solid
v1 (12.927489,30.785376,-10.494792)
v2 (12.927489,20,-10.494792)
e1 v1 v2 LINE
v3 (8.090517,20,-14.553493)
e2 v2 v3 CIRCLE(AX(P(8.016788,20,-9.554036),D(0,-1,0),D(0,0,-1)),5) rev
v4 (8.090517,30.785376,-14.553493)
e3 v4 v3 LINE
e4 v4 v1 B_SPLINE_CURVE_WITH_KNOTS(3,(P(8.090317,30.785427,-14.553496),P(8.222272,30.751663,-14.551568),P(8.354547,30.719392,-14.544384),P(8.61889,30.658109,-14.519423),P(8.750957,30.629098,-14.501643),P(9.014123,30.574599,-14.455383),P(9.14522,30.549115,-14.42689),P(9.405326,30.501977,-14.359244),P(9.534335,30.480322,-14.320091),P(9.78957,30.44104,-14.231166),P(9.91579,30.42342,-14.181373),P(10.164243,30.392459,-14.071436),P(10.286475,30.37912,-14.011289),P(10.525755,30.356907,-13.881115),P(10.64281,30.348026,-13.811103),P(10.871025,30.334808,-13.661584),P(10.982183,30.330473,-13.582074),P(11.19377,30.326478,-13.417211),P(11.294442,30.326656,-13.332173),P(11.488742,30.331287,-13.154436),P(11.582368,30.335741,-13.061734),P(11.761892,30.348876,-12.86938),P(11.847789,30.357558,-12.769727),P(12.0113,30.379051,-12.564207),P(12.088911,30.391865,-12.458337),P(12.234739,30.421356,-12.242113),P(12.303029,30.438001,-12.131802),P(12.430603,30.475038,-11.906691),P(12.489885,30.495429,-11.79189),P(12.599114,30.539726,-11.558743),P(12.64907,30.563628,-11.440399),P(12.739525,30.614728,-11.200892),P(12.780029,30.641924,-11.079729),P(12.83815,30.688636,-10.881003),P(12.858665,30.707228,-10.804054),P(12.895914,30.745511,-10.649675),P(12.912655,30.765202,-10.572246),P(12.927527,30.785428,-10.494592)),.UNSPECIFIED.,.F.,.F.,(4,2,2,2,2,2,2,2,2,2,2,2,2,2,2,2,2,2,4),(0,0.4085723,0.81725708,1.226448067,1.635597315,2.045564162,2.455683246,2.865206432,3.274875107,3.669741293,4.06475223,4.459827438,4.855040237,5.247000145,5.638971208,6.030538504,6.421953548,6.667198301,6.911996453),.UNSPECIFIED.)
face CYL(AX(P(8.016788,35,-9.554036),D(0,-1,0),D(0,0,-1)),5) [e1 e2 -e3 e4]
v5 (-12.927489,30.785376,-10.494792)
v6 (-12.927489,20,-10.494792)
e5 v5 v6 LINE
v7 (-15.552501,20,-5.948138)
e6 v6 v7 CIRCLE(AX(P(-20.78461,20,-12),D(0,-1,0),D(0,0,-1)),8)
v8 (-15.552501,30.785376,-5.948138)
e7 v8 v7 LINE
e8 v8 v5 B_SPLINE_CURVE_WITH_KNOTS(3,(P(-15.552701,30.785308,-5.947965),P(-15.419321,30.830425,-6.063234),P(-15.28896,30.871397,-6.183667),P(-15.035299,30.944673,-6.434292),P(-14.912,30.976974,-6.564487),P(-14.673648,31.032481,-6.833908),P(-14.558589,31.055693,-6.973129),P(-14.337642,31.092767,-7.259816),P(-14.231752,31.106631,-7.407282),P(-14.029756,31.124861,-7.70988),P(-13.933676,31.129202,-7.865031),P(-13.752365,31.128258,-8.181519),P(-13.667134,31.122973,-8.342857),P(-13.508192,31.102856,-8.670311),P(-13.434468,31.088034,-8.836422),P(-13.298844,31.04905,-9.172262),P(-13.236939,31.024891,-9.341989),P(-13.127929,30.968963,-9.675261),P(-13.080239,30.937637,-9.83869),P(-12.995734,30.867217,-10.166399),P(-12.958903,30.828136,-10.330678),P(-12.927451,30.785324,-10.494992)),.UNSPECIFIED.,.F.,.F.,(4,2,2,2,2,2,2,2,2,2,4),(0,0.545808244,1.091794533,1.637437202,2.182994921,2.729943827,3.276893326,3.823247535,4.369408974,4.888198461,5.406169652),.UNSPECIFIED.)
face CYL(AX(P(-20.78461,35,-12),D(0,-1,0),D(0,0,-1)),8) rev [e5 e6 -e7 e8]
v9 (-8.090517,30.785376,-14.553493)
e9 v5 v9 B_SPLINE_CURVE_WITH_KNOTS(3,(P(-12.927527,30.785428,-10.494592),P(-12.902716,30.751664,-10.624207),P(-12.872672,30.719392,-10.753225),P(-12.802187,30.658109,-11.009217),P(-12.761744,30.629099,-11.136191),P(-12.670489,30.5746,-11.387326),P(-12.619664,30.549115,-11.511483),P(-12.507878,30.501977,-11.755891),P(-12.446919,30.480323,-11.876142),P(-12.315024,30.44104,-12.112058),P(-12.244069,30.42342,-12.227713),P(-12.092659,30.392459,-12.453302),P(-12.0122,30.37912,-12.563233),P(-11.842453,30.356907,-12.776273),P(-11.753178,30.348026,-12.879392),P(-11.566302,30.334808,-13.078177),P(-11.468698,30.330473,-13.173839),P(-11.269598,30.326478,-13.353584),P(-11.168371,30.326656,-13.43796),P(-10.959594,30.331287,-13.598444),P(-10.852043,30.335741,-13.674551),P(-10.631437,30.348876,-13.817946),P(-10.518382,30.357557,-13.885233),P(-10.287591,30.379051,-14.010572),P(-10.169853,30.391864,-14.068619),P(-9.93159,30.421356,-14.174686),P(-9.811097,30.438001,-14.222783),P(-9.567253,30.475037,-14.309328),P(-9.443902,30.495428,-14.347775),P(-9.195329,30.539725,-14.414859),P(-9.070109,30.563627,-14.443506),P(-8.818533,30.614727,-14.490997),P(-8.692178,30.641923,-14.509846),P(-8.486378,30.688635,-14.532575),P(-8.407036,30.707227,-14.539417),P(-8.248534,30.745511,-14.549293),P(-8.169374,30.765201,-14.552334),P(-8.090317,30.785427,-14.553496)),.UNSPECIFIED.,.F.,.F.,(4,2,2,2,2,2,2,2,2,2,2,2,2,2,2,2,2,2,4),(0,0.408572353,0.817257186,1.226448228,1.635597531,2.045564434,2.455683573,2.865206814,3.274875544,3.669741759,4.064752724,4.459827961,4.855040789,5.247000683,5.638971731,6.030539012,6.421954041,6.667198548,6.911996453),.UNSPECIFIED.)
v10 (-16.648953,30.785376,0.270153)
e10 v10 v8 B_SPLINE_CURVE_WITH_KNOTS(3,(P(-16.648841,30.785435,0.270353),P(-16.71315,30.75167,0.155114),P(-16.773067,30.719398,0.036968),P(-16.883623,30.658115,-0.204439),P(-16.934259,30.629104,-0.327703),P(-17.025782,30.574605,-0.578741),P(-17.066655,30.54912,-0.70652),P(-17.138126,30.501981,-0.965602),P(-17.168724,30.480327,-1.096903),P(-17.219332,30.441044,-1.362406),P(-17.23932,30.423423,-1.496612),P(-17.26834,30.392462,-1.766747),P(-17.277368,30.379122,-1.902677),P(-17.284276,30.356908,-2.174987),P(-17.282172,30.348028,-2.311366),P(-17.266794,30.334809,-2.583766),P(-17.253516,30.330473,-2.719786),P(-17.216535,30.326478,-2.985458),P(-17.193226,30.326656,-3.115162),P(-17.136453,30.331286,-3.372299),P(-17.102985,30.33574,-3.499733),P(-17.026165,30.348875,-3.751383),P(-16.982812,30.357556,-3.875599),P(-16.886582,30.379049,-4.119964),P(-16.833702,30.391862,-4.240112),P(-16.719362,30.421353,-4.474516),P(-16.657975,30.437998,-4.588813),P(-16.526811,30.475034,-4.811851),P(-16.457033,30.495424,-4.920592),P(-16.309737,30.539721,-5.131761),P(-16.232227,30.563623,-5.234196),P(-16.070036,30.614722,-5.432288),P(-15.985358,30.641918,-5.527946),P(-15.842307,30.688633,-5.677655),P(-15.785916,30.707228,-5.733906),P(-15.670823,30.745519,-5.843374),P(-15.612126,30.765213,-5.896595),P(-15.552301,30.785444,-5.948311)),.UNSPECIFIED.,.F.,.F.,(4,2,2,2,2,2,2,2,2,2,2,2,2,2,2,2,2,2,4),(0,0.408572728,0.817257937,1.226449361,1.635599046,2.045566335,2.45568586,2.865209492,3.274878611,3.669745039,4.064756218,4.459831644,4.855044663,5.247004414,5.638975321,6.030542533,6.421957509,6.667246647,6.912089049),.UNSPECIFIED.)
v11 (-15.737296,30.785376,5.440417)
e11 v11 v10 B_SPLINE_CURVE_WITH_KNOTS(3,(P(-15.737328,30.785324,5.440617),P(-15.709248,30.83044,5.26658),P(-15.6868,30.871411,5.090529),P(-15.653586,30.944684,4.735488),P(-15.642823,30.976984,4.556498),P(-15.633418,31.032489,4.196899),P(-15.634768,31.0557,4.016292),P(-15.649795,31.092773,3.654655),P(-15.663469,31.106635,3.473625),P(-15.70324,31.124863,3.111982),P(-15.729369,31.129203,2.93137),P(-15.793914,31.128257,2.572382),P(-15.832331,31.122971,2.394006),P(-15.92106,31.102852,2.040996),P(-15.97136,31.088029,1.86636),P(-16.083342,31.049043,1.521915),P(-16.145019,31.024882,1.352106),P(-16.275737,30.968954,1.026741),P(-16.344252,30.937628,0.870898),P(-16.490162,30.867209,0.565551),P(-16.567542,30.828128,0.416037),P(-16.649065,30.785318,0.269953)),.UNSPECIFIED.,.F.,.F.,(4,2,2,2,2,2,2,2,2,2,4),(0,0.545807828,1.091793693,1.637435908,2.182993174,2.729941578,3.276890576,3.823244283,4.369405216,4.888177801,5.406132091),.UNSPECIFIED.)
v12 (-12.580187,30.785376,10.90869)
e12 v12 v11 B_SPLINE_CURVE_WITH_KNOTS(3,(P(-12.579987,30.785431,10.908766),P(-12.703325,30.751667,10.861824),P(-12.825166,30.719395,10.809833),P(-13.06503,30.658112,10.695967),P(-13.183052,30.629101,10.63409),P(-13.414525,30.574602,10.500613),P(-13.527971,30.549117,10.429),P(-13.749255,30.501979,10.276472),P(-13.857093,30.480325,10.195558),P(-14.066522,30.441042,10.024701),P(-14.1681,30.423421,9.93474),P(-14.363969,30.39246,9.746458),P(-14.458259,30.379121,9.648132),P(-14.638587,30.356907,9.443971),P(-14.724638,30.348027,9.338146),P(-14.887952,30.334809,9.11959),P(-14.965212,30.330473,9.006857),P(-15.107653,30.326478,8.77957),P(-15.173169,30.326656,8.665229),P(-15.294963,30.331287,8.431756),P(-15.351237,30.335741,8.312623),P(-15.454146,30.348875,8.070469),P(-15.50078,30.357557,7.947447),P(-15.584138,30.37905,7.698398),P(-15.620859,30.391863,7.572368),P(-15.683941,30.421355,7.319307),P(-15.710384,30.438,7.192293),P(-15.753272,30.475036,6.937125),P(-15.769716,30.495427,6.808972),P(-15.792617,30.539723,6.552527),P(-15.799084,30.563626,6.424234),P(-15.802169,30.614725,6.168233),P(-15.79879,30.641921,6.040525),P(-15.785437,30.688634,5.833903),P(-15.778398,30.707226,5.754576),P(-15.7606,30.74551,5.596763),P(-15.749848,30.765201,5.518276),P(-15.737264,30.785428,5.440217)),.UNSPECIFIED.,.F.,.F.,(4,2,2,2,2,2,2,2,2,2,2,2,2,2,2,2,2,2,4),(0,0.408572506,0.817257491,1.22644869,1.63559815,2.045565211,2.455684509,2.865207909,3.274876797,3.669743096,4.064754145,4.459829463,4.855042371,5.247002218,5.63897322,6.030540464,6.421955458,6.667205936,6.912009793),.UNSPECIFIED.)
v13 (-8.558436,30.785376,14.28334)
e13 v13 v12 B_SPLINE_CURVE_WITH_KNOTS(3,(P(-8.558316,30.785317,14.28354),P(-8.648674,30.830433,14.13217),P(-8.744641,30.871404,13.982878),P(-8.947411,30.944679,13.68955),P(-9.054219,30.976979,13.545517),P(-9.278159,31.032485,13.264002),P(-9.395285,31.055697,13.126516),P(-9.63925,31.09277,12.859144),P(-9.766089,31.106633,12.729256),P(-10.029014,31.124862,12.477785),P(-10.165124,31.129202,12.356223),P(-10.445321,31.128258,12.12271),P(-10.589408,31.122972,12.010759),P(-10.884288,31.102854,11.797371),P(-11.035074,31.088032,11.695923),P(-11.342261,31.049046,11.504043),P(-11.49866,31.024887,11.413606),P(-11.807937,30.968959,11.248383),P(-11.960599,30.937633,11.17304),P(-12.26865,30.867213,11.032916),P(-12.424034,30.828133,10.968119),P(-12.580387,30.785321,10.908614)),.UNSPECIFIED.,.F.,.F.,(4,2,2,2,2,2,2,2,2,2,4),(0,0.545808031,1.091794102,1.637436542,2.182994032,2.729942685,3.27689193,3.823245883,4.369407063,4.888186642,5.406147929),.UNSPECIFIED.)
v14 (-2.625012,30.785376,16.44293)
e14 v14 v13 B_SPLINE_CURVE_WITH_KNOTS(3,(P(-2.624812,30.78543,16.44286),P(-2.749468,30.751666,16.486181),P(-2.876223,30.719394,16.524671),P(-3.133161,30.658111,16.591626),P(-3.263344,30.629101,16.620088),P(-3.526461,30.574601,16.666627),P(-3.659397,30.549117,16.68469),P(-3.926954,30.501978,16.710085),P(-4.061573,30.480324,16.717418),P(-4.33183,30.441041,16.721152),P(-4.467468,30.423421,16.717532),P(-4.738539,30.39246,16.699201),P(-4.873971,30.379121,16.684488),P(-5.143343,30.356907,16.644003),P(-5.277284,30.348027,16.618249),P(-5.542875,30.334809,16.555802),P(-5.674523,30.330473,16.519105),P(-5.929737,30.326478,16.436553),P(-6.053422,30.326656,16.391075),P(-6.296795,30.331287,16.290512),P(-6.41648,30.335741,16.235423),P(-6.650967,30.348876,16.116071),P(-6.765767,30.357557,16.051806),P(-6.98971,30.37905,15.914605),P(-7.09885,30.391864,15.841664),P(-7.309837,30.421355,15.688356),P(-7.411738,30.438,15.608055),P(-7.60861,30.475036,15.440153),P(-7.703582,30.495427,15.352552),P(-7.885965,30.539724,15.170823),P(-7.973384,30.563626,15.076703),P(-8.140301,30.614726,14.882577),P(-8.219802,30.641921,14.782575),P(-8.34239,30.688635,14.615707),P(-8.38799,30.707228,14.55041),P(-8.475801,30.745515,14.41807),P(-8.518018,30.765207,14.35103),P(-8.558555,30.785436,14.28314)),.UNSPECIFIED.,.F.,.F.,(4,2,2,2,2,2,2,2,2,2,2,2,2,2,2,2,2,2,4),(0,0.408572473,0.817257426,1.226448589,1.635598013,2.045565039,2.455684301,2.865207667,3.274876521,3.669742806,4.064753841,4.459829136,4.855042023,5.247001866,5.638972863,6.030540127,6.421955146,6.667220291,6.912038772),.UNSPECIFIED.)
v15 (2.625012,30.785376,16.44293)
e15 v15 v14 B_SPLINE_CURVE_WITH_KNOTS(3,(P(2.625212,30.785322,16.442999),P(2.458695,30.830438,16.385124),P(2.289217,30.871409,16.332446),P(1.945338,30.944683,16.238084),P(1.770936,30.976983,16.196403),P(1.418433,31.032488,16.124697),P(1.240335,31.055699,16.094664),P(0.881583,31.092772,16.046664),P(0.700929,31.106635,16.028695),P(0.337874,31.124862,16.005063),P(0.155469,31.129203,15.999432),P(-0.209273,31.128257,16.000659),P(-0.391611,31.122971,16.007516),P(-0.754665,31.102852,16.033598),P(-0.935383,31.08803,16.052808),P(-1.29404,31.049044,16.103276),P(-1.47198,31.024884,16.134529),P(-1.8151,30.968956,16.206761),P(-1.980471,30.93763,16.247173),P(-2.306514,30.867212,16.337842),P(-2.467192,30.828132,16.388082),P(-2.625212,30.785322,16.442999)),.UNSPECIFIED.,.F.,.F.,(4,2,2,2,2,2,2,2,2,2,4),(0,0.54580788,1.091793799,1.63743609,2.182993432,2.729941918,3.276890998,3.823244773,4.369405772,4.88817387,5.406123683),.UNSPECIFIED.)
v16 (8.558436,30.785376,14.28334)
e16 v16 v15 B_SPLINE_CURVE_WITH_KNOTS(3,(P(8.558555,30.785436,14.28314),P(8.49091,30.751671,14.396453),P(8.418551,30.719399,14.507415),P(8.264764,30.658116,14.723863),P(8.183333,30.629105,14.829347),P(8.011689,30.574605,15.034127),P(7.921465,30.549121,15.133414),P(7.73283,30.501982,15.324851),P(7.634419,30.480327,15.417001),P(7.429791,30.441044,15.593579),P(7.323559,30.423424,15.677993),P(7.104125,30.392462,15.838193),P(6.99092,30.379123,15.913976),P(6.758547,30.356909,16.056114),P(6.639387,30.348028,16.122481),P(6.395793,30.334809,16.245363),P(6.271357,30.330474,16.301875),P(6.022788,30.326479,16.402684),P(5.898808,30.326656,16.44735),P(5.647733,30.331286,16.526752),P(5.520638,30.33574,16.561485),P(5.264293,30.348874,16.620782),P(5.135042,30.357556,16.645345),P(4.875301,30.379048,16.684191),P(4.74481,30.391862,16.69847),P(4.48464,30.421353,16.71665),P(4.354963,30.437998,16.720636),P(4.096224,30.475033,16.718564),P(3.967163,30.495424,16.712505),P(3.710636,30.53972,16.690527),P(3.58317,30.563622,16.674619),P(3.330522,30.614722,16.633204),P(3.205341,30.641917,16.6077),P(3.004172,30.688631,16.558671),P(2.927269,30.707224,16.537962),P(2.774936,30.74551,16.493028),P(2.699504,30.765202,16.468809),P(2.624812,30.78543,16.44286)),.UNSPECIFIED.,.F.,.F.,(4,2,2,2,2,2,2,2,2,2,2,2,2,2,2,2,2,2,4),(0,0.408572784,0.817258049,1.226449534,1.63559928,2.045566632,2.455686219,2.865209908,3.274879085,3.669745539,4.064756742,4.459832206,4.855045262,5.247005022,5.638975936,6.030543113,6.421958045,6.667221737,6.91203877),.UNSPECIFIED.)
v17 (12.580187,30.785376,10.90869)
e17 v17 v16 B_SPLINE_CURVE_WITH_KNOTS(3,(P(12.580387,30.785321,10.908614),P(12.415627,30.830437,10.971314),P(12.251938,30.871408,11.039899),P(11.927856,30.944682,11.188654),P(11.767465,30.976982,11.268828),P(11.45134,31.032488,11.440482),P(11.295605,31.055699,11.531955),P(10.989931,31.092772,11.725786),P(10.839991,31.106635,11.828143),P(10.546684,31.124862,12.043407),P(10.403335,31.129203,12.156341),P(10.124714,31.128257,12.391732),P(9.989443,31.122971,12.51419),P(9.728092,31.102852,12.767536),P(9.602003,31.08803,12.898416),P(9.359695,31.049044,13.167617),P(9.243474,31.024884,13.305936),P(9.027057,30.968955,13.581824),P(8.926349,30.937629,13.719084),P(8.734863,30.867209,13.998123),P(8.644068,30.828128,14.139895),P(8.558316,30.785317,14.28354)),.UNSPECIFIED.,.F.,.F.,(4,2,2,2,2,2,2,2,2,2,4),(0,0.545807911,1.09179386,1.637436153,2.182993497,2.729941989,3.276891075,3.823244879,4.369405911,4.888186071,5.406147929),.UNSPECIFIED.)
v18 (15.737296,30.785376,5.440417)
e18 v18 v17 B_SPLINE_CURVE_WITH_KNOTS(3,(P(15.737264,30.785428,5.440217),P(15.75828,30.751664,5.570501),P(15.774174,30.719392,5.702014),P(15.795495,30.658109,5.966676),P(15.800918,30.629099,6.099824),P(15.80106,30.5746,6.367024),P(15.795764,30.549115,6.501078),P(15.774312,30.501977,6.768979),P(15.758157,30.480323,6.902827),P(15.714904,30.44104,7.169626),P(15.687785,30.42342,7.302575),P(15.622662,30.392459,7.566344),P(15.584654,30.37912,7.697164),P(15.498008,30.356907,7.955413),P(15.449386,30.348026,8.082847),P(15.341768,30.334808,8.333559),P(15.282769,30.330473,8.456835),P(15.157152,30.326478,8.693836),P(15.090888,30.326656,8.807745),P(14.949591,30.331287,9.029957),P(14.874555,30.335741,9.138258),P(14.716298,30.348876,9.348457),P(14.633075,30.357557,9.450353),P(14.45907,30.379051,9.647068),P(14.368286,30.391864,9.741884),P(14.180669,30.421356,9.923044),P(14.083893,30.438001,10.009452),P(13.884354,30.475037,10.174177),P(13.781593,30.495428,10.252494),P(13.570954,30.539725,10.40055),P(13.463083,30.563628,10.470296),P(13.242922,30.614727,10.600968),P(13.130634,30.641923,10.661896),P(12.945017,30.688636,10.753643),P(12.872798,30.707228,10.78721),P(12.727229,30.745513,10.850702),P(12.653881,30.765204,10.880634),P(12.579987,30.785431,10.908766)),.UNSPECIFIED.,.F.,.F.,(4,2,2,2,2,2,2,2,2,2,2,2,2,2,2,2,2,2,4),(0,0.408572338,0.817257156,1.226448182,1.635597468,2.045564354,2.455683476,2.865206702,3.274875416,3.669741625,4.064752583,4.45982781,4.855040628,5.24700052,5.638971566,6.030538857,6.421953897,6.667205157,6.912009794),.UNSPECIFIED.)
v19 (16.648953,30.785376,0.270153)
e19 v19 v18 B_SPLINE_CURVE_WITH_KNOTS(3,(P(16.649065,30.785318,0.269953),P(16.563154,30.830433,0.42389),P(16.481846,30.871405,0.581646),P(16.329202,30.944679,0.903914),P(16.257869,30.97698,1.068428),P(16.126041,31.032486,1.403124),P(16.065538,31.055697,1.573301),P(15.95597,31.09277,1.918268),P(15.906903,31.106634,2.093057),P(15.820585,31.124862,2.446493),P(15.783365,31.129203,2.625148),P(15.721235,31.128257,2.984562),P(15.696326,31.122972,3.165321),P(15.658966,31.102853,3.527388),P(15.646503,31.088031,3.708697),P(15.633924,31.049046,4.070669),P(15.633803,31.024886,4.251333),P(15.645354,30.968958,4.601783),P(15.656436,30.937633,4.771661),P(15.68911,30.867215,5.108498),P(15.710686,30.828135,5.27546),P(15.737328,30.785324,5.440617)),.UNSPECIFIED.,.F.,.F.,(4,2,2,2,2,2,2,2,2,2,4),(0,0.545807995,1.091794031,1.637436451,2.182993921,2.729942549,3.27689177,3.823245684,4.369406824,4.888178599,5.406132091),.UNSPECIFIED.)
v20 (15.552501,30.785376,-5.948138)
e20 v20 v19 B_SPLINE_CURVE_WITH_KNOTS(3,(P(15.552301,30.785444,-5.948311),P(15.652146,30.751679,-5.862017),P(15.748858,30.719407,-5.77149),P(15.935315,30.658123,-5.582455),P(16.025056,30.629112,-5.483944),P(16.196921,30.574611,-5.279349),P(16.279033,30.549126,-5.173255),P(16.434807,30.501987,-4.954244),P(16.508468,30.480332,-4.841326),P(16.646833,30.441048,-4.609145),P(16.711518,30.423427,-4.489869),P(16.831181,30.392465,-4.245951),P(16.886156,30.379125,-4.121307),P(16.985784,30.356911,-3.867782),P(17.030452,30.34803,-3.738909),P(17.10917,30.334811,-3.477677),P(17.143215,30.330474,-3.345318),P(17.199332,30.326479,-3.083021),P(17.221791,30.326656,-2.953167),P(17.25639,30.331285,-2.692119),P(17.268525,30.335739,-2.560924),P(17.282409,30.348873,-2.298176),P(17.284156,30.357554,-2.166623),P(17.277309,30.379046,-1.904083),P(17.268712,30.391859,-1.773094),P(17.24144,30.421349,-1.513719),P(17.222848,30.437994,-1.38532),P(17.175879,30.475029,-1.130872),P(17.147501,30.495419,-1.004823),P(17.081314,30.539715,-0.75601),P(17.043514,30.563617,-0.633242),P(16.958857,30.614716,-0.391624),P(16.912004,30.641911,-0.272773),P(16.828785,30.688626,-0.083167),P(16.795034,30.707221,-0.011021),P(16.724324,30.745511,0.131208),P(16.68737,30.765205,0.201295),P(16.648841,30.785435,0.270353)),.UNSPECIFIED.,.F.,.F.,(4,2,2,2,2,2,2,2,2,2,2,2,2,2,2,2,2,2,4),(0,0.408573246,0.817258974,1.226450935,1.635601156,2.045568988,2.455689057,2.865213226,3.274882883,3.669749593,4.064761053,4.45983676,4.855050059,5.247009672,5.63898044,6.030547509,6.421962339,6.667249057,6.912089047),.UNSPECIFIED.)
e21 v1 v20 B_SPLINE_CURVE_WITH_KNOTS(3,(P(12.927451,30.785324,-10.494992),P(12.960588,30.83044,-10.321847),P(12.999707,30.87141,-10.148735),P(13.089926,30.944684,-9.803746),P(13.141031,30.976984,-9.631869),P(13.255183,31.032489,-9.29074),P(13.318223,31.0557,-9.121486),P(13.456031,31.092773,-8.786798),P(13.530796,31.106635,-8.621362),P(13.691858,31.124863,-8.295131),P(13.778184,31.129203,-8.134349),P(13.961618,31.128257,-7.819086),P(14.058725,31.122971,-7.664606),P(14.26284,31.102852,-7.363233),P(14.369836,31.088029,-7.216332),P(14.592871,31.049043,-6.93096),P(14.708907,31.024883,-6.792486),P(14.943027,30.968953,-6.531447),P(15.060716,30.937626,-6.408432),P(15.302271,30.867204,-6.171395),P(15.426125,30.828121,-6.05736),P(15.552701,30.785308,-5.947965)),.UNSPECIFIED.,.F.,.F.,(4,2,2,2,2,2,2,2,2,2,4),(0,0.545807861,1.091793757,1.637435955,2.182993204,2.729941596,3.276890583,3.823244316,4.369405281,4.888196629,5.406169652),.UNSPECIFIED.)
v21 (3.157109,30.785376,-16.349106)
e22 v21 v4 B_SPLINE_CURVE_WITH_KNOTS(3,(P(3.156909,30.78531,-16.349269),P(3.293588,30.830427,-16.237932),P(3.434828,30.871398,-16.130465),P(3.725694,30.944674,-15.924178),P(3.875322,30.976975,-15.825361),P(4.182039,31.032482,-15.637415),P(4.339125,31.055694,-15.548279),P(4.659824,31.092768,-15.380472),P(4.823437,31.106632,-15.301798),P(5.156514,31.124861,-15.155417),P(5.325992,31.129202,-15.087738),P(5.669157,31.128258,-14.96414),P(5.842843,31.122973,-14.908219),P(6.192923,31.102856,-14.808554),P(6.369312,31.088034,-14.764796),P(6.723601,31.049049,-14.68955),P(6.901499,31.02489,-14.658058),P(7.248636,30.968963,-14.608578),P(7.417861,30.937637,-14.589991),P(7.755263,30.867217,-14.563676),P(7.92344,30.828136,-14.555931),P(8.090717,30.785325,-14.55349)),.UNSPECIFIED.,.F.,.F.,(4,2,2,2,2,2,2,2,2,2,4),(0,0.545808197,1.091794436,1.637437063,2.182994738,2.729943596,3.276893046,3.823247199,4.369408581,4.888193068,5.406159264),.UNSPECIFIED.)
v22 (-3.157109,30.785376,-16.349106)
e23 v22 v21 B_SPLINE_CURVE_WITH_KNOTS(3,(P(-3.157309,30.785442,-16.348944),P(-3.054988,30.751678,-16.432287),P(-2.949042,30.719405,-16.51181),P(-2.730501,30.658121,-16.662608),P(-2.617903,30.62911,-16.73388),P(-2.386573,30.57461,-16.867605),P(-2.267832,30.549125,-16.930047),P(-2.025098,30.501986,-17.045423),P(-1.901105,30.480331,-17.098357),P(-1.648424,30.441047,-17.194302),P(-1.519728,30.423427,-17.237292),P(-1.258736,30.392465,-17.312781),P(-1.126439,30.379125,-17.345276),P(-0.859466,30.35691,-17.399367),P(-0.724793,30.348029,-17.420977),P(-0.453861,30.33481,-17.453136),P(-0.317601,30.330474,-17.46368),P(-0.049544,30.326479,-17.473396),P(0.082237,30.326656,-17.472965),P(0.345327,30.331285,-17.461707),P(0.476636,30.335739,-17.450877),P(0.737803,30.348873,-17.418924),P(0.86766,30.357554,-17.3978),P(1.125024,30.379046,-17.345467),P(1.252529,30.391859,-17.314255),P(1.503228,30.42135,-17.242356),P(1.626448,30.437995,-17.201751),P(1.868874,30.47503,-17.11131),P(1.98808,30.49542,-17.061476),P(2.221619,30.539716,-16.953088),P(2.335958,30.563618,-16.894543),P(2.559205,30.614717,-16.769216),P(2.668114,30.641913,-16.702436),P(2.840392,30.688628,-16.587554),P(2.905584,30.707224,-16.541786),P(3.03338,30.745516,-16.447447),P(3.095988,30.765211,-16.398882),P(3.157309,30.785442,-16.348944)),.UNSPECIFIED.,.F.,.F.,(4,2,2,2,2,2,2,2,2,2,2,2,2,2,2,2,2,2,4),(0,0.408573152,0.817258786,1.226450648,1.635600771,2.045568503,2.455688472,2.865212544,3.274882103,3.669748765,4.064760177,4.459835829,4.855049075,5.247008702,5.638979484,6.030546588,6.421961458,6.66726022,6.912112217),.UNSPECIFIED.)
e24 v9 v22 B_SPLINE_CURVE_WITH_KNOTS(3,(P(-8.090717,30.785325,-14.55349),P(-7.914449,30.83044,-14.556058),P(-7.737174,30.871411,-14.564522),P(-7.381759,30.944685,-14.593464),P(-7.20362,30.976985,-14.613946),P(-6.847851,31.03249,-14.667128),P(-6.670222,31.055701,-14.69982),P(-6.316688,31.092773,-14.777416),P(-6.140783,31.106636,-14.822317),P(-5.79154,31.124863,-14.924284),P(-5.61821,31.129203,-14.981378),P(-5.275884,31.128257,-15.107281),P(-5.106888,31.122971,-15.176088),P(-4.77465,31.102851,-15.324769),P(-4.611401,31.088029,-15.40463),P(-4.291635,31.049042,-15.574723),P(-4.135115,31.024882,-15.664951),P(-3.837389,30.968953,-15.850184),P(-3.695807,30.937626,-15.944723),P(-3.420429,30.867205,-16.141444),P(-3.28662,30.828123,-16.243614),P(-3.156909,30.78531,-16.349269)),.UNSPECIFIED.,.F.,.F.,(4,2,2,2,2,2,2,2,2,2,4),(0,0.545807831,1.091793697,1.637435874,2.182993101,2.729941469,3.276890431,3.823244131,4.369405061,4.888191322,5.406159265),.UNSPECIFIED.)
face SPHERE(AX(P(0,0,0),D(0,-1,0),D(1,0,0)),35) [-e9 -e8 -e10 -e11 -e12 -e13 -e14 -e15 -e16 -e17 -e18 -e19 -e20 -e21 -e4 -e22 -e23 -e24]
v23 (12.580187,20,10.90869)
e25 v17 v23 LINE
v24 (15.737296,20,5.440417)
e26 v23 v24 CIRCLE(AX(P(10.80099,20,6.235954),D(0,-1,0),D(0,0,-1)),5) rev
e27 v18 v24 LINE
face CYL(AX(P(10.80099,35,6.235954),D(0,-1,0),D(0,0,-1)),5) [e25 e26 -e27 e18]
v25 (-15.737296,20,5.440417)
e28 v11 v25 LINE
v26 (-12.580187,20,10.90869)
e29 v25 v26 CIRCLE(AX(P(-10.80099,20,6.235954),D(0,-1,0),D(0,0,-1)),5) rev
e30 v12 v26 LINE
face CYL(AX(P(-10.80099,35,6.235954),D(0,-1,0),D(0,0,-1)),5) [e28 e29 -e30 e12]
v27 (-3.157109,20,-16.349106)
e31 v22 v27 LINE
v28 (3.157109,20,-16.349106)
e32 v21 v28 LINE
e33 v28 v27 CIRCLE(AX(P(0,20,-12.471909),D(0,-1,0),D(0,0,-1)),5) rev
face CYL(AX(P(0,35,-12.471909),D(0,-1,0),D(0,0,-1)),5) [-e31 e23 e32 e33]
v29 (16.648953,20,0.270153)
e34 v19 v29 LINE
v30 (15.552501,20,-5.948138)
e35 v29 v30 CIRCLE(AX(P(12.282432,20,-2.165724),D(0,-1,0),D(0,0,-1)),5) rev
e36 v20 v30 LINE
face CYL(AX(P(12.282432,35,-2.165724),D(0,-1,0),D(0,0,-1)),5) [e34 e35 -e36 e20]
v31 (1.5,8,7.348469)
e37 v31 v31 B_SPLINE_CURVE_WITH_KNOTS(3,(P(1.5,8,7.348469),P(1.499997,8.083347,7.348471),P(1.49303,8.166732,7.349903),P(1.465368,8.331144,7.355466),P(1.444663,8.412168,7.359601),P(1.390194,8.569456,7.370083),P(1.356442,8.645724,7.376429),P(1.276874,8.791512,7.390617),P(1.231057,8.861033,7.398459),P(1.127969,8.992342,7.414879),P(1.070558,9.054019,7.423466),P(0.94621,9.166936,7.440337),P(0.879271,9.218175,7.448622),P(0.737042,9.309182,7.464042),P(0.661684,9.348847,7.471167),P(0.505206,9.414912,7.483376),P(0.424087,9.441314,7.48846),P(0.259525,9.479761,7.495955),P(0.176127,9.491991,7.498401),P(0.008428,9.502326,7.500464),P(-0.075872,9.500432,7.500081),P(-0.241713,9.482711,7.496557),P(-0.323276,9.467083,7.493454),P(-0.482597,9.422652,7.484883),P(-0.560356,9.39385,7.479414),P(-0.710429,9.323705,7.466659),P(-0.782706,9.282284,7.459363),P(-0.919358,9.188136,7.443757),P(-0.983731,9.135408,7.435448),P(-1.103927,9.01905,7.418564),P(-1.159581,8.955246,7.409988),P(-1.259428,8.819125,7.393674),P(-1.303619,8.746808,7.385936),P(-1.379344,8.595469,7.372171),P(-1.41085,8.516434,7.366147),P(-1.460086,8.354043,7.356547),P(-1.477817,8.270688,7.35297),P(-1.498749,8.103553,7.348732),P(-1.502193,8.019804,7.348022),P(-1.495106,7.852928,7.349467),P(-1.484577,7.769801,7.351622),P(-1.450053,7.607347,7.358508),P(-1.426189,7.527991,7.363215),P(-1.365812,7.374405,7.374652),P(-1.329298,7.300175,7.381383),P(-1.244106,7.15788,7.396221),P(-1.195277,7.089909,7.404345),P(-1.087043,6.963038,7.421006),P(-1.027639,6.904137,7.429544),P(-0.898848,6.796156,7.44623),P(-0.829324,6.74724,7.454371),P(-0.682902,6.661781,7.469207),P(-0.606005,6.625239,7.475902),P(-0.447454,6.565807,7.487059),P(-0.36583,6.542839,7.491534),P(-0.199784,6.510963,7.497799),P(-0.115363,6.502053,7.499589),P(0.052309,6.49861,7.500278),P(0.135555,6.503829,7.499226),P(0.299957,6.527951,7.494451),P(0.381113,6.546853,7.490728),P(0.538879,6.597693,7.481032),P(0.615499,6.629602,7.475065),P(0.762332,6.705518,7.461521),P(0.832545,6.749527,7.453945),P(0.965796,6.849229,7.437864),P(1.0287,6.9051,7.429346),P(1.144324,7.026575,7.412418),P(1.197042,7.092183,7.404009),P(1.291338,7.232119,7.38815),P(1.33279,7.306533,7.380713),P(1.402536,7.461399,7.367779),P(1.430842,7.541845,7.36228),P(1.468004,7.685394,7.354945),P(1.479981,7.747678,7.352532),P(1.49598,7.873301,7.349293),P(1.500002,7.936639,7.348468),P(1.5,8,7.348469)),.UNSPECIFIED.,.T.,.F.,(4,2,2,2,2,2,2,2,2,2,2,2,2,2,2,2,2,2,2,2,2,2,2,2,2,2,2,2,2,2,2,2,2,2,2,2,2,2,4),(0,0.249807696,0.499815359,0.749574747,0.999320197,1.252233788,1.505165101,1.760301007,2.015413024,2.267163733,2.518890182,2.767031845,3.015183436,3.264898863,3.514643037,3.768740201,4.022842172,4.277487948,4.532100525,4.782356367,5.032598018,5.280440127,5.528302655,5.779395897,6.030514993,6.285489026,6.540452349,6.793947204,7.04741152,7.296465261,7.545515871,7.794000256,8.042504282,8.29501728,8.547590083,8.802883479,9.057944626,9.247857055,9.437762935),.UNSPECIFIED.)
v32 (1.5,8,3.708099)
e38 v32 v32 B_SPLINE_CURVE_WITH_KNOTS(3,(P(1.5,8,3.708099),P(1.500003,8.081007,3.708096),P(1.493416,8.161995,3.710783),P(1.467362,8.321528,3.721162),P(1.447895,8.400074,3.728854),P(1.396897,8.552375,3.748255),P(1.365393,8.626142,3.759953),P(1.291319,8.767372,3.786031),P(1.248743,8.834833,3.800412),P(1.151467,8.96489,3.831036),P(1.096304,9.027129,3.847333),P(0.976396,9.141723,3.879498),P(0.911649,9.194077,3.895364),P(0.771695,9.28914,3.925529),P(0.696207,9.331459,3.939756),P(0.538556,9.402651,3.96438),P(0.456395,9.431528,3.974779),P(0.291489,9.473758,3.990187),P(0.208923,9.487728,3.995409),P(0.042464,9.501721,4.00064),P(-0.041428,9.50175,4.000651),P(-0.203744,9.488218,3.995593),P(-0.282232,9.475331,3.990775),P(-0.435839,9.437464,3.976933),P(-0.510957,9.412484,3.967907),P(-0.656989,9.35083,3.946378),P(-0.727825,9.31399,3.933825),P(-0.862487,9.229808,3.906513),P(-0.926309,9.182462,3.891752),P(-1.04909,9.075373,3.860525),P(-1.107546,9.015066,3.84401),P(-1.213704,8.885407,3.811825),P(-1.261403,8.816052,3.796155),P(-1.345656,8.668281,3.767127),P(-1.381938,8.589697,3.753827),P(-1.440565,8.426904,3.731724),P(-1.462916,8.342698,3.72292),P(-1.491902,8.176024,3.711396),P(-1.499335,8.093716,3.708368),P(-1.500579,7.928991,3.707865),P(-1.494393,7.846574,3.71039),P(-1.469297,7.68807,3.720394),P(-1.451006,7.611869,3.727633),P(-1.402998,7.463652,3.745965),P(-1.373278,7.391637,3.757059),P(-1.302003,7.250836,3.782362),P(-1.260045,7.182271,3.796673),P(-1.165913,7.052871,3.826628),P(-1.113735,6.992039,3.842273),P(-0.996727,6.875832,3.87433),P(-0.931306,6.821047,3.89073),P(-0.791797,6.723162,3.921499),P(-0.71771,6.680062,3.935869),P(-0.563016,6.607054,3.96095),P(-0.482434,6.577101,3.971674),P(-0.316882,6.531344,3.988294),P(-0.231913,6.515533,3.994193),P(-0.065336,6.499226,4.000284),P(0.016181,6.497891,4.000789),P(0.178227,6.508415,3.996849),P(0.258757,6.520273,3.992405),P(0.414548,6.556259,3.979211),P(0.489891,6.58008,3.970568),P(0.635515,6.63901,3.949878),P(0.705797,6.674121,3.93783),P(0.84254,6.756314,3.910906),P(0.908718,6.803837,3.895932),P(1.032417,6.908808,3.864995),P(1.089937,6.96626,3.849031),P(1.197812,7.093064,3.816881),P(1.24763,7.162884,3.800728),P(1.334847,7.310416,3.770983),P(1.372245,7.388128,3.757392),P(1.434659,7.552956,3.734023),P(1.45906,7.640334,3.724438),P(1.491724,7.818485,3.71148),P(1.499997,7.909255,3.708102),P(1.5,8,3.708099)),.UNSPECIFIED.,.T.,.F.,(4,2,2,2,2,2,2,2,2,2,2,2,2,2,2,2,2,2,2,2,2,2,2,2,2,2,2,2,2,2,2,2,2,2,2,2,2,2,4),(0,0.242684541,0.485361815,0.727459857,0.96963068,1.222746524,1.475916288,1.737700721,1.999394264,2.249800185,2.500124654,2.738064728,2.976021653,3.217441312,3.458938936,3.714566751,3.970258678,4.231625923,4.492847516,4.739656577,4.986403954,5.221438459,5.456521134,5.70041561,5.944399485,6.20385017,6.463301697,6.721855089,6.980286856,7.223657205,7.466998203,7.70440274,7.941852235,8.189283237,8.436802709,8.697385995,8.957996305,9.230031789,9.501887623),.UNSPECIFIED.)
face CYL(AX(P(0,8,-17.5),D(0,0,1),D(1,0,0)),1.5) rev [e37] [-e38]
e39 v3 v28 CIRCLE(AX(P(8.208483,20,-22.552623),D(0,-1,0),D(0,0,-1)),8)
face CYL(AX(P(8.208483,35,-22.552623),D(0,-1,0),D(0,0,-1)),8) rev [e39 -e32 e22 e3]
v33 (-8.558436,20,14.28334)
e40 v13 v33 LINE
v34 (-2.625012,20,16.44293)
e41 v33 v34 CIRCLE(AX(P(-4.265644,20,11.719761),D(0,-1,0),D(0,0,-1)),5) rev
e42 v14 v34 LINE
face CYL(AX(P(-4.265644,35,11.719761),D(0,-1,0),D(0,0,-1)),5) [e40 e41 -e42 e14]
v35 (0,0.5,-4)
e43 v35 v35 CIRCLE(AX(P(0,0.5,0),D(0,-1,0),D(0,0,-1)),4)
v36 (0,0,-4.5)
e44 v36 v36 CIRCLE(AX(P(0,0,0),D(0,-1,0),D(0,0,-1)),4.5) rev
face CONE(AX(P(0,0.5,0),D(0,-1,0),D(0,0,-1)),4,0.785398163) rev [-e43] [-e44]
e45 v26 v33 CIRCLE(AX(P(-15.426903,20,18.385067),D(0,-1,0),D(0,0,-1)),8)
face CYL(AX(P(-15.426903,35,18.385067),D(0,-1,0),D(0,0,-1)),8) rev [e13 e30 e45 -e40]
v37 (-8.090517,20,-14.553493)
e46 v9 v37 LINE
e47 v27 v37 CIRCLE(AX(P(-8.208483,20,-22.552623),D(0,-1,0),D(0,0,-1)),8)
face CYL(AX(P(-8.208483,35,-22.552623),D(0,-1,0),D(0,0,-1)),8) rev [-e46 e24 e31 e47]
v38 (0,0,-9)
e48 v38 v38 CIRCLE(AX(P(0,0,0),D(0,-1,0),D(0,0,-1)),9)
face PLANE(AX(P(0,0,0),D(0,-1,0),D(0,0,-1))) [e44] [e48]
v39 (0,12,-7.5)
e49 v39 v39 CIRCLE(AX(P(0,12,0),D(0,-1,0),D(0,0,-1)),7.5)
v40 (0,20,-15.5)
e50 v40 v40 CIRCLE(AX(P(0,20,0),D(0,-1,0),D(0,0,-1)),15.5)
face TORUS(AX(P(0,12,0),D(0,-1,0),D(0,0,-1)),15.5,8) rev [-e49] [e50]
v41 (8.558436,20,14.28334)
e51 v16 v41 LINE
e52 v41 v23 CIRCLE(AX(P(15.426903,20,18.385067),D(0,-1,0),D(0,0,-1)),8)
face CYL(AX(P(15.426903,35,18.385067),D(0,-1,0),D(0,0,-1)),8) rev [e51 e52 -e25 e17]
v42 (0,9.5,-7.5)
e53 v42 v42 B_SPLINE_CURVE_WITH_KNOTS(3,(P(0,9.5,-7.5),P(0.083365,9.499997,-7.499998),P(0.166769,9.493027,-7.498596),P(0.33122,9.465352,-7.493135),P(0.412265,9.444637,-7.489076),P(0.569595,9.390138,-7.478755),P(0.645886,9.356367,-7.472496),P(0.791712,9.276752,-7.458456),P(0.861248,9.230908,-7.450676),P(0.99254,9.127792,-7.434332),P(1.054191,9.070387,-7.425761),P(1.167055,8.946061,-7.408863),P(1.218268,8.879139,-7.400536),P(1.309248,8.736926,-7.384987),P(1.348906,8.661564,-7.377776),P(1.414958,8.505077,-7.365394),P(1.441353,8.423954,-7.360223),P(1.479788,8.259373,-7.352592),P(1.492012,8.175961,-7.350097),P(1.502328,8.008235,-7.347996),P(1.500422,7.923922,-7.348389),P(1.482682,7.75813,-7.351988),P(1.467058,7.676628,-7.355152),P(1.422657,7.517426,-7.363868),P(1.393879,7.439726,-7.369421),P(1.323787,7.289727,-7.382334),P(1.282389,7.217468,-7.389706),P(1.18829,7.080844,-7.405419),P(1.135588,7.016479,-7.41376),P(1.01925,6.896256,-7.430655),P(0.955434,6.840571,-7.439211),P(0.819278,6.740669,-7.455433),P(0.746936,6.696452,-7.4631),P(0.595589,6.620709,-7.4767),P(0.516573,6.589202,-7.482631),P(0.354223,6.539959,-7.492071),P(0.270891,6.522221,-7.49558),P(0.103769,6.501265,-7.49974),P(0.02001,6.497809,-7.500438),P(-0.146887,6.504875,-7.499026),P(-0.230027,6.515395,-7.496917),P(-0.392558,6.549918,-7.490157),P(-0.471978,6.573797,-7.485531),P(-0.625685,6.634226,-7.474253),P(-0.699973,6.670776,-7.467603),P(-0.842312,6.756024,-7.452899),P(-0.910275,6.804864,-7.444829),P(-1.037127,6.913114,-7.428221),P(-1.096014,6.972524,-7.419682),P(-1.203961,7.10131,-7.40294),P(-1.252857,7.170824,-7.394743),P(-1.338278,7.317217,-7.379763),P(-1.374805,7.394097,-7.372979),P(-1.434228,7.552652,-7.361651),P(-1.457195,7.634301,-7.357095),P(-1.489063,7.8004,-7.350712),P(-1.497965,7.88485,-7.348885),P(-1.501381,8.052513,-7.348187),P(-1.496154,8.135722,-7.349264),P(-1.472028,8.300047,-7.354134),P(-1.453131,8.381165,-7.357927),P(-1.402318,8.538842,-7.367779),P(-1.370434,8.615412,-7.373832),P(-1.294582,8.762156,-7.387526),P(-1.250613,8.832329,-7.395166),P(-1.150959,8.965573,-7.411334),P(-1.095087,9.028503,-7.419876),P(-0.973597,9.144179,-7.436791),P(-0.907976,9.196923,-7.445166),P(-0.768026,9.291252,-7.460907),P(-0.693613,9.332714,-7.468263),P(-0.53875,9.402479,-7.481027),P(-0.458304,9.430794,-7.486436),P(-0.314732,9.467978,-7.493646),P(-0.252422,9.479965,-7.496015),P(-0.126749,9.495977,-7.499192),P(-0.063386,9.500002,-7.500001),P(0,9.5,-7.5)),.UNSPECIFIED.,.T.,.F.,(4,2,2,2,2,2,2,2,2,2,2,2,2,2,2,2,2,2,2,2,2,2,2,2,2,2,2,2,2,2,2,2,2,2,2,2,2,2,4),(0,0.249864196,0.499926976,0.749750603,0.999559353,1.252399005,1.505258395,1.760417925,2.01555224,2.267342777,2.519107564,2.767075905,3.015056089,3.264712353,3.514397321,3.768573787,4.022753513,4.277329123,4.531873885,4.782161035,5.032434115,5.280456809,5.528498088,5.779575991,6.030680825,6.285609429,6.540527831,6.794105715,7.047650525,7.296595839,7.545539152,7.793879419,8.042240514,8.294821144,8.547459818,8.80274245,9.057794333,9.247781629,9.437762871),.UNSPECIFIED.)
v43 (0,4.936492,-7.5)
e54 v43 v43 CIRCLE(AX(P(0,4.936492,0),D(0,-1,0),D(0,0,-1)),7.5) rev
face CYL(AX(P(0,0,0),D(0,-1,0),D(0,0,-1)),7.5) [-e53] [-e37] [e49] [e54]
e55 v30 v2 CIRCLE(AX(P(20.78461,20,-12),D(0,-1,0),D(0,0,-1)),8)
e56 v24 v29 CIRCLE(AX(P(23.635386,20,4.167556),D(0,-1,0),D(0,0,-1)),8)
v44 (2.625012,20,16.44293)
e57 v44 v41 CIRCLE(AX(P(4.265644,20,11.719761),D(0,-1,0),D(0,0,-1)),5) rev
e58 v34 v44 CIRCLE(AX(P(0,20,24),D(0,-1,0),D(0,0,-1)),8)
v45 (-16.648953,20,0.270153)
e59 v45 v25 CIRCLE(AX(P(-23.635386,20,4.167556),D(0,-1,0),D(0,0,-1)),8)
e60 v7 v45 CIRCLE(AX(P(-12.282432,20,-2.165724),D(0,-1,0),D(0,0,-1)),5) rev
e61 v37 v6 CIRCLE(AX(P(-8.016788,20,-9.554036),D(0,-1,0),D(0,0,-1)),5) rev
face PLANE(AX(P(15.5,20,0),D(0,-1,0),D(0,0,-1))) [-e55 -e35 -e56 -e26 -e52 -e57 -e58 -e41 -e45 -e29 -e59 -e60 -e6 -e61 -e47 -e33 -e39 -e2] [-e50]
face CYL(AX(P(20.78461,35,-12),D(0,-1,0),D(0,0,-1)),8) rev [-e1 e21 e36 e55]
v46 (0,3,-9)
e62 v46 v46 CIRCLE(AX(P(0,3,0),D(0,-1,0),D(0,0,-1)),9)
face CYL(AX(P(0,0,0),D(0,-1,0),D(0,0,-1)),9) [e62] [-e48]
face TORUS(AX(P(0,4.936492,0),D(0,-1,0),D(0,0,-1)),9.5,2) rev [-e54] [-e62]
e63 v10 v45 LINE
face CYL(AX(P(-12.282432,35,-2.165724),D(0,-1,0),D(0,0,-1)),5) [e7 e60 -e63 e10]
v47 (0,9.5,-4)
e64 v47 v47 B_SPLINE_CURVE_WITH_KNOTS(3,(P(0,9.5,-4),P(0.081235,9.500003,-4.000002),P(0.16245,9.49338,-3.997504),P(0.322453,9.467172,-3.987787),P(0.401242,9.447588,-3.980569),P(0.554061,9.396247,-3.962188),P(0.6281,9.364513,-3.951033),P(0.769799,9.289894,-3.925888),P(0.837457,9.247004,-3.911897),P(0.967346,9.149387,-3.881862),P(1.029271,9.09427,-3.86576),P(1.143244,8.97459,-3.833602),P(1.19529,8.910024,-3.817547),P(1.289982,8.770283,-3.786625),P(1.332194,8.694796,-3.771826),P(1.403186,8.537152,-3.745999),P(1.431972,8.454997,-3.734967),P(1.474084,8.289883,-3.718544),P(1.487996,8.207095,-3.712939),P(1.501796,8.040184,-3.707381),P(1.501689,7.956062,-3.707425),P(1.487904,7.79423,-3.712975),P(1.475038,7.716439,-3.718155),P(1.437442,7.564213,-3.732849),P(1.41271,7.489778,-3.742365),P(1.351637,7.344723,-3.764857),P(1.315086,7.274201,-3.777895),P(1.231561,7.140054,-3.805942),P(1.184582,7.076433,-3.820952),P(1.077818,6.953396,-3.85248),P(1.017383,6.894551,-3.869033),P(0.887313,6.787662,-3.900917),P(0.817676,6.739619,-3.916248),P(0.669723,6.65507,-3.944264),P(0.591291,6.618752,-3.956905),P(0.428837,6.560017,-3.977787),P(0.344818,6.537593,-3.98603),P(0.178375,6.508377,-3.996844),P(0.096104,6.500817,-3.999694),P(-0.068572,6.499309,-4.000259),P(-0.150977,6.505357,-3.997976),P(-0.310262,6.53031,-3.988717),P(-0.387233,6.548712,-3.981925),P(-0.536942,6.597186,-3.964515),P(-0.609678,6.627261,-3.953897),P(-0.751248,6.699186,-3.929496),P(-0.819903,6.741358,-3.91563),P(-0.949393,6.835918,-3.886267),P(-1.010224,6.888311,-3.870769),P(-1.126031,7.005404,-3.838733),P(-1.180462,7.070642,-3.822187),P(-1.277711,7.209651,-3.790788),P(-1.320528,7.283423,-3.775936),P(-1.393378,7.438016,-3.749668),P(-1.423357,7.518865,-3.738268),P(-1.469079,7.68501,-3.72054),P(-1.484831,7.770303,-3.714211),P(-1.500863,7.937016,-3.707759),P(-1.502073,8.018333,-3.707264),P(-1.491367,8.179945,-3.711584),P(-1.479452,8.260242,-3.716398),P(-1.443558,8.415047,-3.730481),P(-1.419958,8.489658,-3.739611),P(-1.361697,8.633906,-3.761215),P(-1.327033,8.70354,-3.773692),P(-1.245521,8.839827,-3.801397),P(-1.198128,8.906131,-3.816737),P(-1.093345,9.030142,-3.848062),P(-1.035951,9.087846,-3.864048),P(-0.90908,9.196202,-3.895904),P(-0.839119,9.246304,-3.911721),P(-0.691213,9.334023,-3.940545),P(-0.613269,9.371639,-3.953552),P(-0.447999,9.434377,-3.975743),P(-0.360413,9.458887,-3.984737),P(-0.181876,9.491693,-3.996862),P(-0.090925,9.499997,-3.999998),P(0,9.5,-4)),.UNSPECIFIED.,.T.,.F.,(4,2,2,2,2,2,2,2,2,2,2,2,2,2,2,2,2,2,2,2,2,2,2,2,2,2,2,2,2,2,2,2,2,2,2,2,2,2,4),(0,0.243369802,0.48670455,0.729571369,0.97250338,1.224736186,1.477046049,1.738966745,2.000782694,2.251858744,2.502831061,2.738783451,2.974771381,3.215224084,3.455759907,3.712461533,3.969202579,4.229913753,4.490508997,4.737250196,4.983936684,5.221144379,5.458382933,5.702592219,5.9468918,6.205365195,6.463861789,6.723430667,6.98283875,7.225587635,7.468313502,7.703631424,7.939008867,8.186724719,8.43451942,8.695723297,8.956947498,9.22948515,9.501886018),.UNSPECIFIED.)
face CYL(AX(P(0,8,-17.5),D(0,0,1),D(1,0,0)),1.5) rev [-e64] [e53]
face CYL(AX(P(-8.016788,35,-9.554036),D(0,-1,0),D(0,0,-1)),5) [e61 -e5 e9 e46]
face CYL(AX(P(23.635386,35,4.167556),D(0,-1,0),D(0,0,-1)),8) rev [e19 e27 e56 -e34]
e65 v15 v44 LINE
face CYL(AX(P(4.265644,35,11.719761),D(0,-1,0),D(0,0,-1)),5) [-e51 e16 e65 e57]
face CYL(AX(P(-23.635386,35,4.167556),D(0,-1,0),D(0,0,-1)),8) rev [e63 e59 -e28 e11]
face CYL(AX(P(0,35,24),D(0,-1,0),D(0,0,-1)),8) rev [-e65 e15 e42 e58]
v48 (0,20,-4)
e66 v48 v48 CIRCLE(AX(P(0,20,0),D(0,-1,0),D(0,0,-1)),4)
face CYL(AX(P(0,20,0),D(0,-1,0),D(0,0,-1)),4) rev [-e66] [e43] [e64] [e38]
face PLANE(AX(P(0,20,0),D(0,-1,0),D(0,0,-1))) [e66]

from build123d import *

# Parameters (mm, degrees)
FILLET_1_R               = 2
SKETCH_2_R               = 4
CUT_EXTRUDE_1_DEPTH      = 20
CUT_EXTRUDE_2_DEPTH      = 43.866070499
CUT_EXTRUDE_2_DEPTH_BACK = 43.866070499
SKETCH_3_R               = 1.5
CHAMFER_1_SIZE           = 0.5
CUT_EXTRUDE_3_DEPTH      = 43.866070499
CUT_EXTRUDE_3_DEPTH_BACK = 43.866070499
SKETCH_4_OUTSIDE_W       = 49.124
SKETCH_4_OUTSIDE_H       = 49.124


with BuildPart() as part:
    # 草图1 → 旋转1 (revolve)
    with BuildSketch(Plane.XY, mode=Mode.PRIVATE) as revolve_1_sk:
        with BuildLine():
            Line((0, 0), (9, 0))
            Line((9, 0), (9, 3))
            Line((9, 3), (7.5, 3))
            Line((7.5, 3), (7.5, 12))
            ThreePointArc((7.5, 12), (9.843145751, 17.656854249), (15.5, 20))
            Line((15.5, 20), (17.5, 20))
            Line((17.5, 20), (17.5, 30.310889132))
            ThreePointArc((17.5, 30.310889132), (9.058666579, 33.80740392), (0, 35))
            Line((0, 35), (0, 0))
        make_face()
    revolve(revolve_1_sk.sketch.rotate(Axis((0, 0, 0), (0, 1, 0)), 90), axis=Axis((0, 0, 0), (0, 1, 0)))

    # 圆角1
    # the kernel refuses this fillet: 2 mm, written as the material it adds along each edge
    with BuildSketch(Plane(origin=(0, 3, 0), x_dir=(0, 0, -1), z_dir=(1, 0, 0))) as fillet_1_piece_1:
        with BuildLine():
            CenterArc((9.5, 1.936491673), FILLET_1_R, 180, 75.522487814)
            Line((7.5, 1.936491673), (7.46, 1.936491673))
            Line((7.46, 1.936491673), (7.46, 0))
            Line((7.46, 0), (7.5, -0.04))
            ThreePointArc((7.5, -0.04), (8.25, -0.04), (8.99, -0.038729833))
            Line((8.99, -0.038729833), (9, 0))
        make_face()
    revolve(axis=Axis((0, 3, 0), (0, 1, 0)))

    # 草图2 → 切除-拉伸1 (cut)
    with BuildSketch(Plane.XZ):
        with Locations(Location((0, 0, 0), (0, 0, 270))):
            Circle(SKETCH_2_R)
    extrude(amount=-CUT_EXTRUDE_1_DEPTH, mode=Mode.SUBTRACT)

    # 草图3 → 切除-拉伸2 (cut, two sides: drawn at the far end of the back side and taken through both)
    with BuildSketch(Plane.XY.offset(-CUT_EXTRUDE_2_DEPTH_BACK)):
        with Locations((0, 8)):
            Circle(SKETCH_3_R)
    extrude(amount=CUT_EXTRUDE_2_DEPTH + CUT_EXTRUDE_2_DEPTH_BACK, mode=Mode.SUBTRACT)

    # 倒角1
    chamfer_1_edges = [part.edges().sort_by_distance(p)[0] for p in [
        (0, 0, 4),
    ]]
    chamfer(chamfer_1_edges, length=CHAMFER_1_SIZE)

    # 草图4 outside → 切除-拉伸3 (cut, two sides: drawn at the far end of the back side and taken through both)
    with BuildSketch(Plane(origin=(0, 0, 0), x_dir=(1, 0, 0), z_dir=(0, 1, 0)).offset(-CUT_EXTRUDE_3_DEPTH_BACK)):
        Rectangle(SKETCH_4_OUTSIDE_W, SKETCH_4_OUTSIDE_H)
        with BuildLine():
            ThreePointArc((2.625011684, -16.442929558), (0, -16), (-2.625011684, -16.442929558))
            ThreePointArc((-2.625011684, -16.442929558), (-5.975744703, -16.418223636), (-8.558435773, -14.283339803))
            ThreePointArc((-8.558435773, -14.283339803), (-10.284601755, -12.25671109), (-12.580187001, -10.908689831))
            ThreePointArc((-12.580187001, -10.908689831), (-15.13111675, -8.735954329), (-15.737296016, -5.440416612))
            ThreePointArc((-15.737296016, -5.440416612), (-15.756924048, -2.778370843), (-16.648953007, -0.270152895))
            ThreePointArc((-16.648953007, -0.270152895), (-17.206471106, 3.033965099), (-15.552500552, 5.948137976))
            ThreePointArc((-15.552500552, 5.948137976), (-13.856406461, 8), (-12.927488868, 10.494791583))
            ThreePointArc((-12.927488868, 10.494791583), (-11.230726403, 13.384258538), (-8.090517233, 14.553492698))
            ThreePointArc((-8.090517233, 14.553492698), (-5.472322293, 15.035081933), (-3.157109015, 16.349106443))
            ThreePointArc((-3.157109015, 16.349106443), (0, 17.471908657), (3.157109015, 16.349106443))
            ThreePointArc((3.157109015, 16.349106443), (5.472322293, 15.035081933), (8.090517233, 14.553492698))
            ThreePointArc((8.090517233, 14.553492698), (11.230726403, 13.384258538), (12.927488868, 10.494791583))
            ThreePointArc((12.927488868, 10.494791583), (13.856406461, 8), (15.552500552, 5.948137976))
            ThreePointArc((15.552500552, 5.948137976), (17.206471106, 3.033965099), (16.648953007, -0.270152895))
            ThreePointArc((16.648953007, -0.270152895), (15.756924048, -2.778370843), (15.737296016, -5.440416612))
            ThreePointArc((15.737296016, -5.440416612), (15.13111675, -8.735954329), (12.580187001, -10.908689831))
            ThreePointArc((12.580187001, -10.908689831), (10.284601755, -12.25671109), (8.558435773, -14.283339803))
            ThreePointArc((8.558435773, -14.283339803), (5.975744703, -16.418223636), (2.625011684, -16.442929558))
        make_face(mode=Mode.SUBTRACT)
    extrude(amount=CUT_EXTRUDE_3_DEPTH + CUT_EXTRUDE_3_DEPTH_BACK, mode=Mode.SUBTRACT)


solid = part.part
